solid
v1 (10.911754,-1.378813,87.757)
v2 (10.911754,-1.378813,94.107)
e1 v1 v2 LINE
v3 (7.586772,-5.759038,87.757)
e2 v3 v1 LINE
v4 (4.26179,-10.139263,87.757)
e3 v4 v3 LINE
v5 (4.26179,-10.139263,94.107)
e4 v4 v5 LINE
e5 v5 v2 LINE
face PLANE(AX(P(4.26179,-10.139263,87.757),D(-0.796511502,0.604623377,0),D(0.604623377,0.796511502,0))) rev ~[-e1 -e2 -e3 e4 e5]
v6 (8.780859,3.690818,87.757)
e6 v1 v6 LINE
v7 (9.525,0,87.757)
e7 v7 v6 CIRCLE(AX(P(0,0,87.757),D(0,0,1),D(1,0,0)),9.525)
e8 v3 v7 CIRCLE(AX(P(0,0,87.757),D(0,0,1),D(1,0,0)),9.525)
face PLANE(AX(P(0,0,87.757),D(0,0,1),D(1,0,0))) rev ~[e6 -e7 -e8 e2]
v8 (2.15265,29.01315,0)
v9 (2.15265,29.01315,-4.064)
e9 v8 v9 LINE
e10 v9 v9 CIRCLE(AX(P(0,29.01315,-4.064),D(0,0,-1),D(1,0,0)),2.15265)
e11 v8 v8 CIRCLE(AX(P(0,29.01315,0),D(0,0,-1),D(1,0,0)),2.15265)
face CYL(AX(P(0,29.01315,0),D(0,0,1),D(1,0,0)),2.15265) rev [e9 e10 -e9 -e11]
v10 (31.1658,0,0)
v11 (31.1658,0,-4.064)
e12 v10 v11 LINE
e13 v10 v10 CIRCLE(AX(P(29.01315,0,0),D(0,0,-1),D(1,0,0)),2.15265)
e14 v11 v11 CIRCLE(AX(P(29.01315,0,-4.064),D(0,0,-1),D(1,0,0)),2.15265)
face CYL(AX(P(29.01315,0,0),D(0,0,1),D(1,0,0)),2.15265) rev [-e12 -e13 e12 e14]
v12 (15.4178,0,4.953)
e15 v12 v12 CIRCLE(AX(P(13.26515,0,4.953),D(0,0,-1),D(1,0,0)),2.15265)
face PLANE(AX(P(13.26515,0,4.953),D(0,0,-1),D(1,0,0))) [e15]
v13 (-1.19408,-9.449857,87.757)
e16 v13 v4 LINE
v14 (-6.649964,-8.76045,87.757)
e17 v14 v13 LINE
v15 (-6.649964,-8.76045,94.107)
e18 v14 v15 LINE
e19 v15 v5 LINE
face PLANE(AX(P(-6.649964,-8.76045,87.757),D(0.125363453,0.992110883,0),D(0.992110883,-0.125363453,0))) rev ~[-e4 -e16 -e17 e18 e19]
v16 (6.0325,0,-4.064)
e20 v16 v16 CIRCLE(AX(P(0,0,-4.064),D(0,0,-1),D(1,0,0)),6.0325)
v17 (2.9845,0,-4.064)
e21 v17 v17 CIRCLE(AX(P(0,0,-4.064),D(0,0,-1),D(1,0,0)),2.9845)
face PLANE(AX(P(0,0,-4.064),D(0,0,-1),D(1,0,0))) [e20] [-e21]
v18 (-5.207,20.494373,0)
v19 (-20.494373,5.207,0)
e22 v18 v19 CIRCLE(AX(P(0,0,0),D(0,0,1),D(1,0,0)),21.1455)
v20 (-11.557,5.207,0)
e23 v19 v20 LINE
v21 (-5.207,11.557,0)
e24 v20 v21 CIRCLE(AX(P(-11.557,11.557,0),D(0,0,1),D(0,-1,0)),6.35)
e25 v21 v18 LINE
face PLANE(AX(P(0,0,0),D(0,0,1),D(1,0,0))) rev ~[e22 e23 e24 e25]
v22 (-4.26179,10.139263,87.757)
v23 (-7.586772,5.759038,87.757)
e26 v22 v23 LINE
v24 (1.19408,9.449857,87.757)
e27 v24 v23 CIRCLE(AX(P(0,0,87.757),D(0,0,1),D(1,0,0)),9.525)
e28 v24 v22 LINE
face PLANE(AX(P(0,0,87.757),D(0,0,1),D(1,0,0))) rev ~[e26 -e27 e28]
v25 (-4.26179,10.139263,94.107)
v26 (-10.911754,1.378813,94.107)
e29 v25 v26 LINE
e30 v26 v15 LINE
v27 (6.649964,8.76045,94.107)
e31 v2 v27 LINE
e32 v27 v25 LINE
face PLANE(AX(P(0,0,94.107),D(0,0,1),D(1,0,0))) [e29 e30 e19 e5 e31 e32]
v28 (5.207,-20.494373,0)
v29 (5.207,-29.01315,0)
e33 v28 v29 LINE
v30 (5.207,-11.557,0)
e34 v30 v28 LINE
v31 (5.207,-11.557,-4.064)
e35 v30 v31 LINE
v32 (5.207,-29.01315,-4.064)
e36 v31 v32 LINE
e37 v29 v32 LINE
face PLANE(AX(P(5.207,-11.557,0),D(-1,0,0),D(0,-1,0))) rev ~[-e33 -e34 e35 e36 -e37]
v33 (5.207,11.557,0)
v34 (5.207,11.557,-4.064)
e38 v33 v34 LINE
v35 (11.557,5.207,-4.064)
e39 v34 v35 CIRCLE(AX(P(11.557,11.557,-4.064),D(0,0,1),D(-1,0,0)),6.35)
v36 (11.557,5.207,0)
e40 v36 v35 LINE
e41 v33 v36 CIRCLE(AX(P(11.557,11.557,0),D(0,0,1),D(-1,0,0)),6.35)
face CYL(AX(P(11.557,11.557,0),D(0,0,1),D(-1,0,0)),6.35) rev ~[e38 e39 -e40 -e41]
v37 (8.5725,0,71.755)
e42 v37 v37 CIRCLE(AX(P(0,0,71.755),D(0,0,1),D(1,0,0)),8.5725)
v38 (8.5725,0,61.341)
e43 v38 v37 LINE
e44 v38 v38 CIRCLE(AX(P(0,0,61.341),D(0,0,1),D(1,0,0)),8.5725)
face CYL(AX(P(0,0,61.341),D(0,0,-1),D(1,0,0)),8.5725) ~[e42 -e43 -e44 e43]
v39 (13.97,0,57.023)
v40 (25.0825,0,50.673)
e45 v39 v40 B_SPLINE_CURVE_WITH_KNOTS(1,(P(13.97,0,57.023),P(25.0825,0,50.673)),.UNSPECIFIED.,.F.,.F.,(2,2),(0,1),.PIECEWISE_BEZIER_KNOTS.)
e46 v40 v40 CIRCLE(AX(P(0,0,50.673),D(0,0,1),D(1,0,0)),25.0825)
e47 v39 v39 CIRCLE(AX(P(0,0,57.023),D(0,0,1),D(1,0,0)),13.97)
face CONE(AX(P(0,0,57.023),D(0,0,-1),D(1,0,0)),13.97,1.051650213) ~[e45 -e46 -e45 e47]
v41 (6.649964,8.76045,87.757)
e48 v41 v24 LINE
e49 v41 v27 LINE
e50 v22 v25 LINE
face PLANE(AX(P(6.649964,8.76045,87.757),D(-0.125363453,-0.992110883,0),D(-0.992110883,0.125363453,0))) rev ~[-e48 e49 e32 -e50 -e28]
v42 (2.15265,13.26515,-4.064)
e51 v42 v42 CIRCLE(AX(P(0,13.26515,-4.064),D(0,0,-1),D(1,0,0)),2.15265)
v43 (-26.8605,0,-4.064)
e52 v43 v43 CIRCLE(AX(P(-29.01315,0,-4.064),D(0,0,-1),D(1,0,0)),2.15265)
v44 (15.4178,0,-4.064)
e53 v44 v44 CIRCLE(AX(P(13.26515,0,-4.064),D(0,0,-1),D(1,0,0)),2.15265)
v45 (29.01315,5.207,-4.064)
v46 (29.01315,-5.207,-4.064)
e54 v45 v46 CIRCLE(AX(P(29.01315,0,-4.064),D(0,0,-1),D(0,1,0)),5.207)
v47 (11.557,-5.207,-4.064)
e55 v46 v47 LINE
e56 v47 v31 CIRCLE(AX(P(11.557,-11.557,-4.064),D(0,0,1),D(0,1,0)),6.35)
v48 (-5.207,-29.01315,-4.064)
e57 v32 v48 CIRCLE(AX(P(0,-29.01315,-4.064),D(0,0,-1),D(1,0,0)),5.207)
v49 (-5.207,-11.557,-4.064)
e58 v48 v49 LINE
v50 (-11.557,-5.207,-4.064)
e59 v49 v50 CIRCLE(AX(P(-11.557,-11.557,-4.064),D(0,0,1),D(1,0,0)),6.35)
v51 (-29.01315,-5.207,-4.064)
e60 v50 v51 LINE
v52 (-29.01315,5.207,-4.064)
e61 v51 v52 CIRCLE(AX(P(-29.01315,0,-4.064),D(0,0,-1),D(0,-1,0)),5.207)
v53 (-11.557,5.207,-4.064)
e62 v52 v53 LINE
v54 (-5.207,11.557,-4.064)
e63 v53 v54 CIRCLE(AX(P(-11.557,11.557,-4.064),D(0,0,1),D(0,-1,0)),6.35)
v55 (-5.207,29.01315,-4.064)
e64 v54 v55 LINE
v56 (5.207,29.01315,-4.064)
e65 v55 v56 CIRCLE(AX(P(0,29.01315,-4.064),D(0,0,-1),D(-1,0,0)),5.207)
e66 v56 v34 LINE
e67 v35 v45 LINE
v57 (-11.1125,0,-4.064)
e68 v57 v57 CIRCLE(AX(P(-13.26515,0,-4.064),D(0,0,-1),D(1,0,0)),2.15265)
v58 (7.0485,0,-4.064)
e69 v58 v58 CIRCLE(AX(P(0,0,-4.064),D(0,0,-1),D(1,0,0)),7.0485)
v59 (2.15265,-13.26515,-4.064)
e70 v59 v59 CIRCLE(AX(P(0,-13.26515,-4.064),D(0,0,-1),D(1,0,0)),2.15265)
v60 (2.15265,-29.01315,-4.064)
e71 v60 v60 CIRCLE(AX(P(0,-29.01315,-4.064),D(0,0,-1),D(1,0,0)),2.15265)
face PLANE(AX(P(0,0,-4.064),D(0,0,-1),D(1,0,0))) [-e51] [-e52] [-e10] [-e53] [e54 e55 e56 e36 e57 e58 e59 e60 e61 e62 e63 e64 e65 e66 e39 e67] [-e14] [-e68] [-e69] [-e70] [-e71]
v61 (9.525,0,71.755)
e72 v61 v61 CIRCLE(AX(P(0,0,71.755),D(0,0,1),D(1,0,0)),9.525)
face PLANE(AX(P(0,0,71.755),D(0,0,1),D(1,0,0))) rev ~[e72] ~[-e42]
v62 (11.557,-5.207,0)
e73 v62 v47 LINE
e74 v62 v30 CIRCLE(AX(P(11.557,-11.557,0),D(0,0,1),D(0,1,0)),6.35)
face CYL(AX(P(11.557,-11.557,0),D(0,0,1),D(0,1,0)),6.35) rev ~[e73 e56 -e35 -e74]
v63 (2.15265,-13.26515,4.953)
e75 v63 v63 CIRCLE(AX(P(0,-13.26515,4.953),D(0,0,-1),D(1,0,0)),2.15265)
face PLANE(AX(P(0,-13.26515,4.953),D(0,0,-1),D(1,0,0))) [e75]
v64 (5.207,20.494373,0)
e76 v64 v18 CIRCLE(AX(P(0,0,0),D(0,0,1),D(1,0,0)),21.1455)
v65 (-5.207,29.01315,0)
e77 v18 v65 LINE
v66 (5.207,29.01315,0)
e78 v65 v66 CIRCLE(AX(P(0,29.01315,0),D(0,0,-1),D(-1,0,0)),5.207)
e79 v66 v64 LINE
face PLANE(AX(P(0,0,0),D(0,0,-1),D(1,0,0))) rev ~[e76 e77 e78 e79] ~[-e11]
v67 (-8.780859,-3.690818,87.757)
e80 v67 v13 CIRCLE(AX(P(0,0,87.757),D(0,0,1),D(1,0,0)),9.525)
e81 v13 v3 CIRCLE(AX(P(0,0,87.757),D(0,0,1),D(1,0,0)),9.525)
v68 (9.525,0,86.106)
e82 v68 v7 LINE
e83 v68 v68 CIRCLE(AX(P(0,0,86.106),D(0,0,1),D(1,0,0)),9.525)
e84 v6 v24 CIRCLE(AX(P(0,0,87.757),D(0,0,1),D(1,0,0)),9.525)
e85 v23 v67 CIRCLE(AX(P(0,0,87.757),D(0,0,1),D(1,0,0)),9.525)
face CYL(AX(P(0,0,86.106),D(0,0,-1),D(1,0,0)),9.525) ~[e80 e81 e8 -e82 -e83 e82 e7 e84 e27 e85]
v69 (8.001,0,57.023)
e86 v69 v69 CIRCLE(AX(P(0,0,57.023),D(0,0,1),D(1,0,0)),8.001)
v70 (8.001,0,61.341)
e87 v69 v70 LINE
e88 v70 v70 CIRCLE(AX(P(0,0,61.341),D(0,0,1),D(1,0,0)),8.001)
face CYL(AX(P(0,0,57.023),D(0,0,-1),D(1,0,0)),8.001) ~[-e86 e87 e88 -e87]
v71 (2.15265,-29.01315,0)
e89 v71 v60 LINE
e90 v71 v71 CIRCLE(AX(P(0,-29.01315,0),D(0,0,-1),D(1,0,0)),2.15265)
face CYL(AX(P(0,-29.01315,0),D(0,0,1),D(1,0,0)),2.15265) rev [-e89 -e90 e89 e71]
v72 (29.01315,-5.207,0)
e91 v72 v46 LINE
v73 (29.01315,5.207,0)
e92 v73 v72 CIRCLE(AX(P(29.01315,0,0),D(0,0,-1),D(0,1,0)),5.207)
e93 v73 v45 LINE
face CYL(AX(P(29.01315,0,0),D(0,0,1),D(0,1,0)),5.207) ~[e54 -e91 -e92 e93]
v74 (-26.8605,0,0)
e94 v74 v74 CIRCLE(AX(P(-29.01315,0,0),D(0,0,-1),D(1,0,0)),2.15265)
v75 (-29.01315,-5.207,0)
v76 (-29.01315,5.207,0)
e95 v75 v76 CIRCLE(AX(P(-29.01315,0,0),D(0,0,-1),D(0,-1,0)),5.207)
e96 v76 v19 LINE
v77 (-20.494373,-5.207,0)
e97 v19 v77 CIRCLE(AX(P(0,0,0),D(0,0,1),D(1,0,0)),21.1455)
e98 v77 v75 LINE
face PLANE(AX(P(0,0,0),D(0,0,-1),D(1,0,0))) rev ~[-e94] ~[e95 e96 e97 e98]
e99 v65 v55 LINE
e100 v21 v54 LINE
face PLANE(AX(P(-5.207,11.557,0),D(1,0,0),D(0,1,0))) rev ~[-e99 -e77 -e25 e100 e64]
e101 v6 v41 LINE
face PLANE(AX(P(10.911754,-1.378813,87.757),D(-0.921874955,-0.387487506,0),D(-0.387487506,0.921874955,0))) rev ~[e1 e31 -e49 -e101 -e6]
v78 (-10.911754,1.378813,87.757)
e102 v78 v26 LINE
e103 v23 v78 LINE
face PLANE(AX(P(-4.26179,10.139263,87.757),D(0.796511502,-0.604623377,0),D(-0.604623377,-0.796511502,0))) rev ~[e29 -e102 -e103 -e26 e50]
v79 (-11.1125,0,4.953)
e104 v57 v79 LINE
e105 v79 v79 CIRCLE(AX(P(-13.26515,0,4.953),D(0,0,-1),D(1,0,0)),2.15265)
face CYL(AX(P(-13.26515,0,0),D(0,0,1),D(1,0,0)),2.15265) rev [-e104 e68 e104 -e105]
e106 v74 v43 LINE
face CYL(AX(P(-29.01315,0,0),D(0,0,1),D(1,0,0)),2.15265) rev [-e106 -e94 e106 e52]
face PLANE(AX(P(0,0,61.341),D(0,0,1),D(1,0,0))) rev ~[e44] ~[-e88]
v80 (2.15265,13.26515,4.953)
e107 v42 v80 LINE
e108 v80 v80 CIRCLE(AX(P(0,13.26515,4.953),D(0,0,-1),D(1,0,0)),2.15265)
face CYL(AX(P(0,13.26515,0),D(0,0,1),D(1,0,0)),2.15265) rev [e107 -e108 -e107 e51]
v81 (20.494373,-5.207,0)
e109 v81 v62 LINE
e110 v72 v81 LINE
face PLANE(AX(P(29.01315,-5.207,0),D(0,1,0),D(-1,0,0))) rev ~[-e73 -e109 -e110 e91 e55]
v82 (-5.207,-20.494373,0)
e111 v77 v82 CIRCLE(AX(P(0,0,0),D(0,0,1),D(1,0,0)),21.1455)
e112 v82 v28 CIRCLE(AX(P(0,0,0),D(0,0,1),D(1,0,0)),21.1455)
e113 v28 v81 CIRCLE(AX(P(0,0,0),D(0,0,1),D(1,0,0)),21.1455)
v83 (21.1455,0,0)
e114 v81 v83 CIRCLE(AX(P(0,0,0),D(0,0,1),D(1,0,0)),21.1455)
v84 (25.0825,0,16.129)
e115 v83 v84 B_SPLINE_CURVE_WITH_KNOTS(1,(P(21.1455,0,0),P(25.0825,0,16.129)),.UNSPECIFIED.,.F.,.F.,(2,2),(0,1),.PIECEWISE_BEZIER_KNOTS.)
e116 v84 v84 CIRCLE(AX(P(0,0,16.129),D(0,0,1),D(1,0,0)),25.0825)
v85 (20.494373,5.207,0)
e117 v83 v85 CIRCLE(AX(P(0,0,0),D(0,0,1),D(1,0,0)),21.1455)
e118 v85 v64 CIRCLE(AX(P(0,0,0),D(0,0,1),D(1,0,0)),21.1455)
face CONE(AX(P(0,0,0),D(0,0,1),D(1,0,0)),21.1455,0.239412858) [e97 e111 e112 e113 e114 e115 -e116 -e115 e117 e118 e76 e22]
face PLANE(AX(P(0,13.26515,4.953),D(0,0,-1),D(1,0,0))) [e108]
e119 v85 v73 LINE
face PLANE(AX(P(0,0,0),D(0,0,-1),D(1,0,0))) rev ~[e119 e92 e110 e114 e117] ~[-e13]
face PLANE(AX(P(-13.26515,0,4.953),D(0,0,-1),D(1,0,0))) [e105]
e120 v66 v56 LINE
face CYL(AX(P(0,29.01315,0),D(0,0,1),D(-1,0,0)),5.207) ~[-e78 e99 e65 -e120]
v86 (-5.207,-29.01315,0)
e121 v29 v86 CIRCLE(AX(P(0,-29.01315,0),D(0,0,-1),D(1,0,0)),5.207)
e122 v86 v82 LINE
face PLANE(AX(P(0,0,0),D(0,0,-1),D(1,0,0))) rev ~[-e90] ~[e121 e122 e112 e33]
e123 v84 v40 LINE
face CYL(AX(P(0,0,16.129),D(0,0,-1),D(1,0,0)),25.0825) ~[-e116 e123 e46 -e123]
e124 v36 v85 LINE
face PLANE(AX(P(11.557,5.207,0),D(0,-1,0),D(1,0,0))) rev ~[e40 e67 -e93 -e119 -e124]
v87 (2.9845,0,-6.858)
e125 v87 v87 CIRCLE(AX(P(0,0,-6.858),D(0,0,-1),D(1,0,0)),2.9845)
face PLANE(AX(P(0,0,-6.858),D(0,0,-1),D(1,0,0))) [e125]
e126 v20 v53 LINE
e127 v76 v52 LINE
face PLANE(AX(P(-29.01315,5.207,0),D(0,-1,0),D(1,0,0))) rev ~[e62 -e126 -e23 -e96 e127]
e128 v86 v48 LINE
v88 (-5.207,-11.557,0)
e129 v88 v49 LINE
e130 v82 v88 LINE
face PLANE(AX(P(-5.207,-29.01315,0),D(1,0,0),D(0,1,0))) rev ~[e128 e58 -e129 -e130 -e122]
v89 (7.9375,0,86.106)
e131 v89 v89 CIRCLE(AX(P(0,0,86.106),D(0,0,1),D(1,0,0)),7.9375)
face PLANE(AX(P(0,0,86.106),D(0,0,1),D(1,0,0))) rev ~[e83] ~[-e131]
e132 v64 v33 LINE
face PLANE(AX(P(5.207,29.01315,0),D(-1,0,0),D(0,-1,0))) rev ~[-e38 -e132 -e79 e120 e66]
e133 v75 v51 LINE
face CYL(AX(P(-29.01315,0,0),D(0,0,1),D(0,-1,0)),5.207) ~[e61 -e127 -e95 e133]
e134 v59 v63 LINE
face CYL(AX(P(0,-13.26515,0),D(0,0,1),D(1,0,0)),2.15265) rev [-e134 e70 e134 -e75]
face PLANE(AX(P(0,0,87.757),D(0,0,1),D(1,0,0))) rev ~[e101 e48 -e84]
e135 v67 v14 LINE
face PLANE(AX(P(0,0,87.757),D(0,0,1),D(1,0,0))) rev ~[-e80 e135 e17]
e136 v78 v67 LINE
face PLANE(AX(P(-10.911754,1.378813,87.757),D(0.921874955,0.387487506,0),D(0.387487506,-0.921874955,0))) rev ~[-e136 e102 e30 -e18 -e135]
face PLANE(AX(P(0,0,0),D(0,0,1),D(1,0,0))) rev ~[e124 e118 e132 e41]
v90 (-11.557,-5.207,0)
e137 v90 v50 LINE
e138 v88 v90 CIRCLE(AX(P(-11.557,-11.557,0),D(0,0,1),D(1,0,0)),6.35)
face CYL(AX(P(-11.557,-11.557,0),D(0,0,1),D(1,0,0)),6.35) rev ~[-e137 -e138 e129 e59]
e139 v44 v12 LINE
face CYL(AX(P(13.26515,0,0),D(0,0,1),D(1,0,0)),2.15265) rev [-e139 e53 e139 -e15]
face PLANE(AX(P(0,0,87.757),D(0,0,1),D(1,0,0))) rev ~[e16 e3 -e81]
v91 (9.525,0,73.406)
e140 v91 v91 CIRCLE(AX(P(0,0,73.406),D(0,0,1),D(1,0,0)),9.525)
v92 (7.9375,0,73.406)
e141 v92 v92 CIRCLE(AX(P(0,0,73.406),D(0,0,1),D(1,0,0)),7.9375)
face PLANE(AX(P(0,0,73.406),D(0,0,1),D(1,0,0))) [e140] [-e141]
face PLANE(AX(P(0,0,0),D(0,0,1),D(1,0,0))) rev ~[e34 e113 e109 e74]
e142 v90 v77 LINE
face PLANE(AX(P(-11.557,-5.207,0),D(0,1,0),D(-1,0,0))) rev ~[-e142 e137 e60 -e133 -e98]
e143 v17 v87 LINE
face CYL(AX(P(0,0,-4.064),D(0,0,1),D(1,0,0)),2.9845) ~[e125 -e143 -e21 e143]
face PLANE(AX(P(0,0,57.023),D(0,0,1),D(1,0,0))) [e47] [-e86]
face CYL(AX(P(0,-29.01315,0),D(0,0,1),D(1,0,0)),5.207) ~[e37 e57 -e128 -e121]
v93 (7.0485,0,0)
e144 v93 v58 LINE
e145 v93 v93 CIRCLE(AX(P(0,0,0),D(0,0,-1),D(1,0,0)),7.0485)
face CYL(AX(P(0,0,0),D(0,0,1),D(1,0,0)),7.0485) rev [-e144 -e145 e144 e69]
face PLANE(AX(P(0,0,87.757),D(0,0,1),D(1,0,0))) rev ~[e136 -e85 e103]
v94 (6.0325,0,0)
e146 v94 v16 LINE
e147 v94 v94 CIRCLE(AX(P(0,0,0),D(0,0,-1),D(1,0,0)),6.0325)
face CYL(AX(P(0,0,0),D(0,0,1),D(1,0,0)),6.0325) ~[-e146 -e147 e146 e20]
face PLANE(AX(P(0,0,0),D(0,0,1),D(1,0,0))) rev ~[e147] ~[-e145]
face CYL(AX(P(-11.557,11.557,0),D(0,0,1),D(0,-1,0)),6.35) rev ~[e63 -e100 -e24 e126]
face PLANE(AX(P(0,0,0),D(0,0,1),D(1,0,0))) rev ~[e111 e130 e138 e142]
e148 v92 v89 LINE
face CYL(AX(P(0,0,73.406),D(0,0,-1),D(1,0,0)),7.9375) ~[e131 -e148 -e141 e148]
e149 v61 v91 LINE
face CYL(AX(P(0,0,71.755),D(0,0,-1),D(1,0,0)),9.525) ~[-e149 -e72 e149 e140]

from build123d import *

# Parameters (mm, degrees)
F0_R      = 21.1455
F2_R      = 25.0825
F4_DEPTH  = 34.544
F6_R      = 13.97
F4_FACE_R = 25.0825
F8_R      = 8.001
F9_DEPTH  = 4.318
F10_R     = 3.00355
F11_DEPTH = 15.24
F12_R     = 6.0325
F13_DEPTH = 4.064
F14_R     = 2.9845
F15_DEPTH = 2.794
F16_R     = 2.15265
F17_DEPTH = 4.953
F18_R     = 2.15265
F18_R_2   = 7.0485
F19_DEPTH = 4.064
F20_R     = 8.5725
F21_DEPTH = 10.414
F22_R     = 9.525
F23_DEPTH = 1.651
F24_R     = 7.9375
F25_DEPTH = 12.7
F26_R     = 9.525
F27_DEPTH = 1.651
F29_DEPTH = 6.35


# Not quite as in the source:
# - a feature names something its author has since deleted; it is built from what else it names


with BuildPart() as f3:
    # F0 (on Top) → F3 section 0
    with BuildSketch(Plane.XY):
        Circle(F0_R)
    # F2 (on offset) → F3 section 1
    with BuildSketch(Plane.XY.offset(16.129)):
        Circle(F2_R)
    loft()

    # F4 (add): a face of the model
    f4_faces = [f3.faces().sort_by_distance(p)[0] for p in [
        (0, 0, 16.129),
    ]]
    extrude(f4_faces, amount=F4_DEPTH)

    # F6 (on offset) → F7 section 0
    with BuildSketch(Plane.XY.offset(57.023)):
        Circle(F6_R)
    # F4_face (on face) → F7 section 1
    with BuildSketch(Plane.XY.offset(50.673)):
        Circle(F4_FACE_R)
    loft()

    # F8 (on face) → F9 (join)
    with BuildSketch(Plane.XY.offset(57.023)):
        Circle(F8_R)
    extrude(amount=F9_DEPTH)

    # F10 (on face) → F11 (join)
    with BuildSketch(Plane.XY.offset(61.341)):
        Circle(F10_R)
    extrude(amount=F11_DEPTH)

    # F12 (on face) → F13 (join)
    with BuildSketch(Plane(origin=(0, 0, 0), x_dir=(1, 0, 0), z_dir=(0, 0, -1))):
        Circle(F12_R)
    extrude(amount=F13_DEPTH)

    # F14 (on face) → F15 (join)
    with BuildSketch(Plane(origin=(0, 0, -4.064), x_dir=(1, 0, 0), z_dir=(0, 0, -1))):
        Circle(F14_R)
    extrude(amount=F15_DEPTH)

    # F16 (on face) → F17 (cut)
    with BuildSketch(Plane(origin=(0, 0, 0), x_dir=(1, 0, 0), z_dir=(0, 0, -1))):
        with Locations((0, 13.26515)):
            Circle(F16_R)
        with Locations((13.26515, 0)):
            Circle(F16_R)
        with Locations((0, -13.26515)):
            Circle(F16_R)
        with Locations((-13.26515, 0)):
            Circle(F16_R)
    extrude(amount=-F17_DEPTH, mode=Mode.SUBTRACT)

    # F18 (on face) → F19 (join)
    with BuildSketch(Plane(origin=(0, 0, 0), x_dir=(1, 0, 0), z_dir=(0, 0, -1))):
        with BuildLine():
            ThreePointArc((11.557, 5.207), (7.0668719395, 7.0668719395), (5.207, 11.557))
            Line((5.207, 11.557), (5.207, 29.01315))
            ThreePointArc((5.207, 29.01315), (0, 34.22015), (-5.207, 29.01315))
            Line((-5.207, 29.01315), (-5.207, 11.557))
            ThreePointArc((-5.207, 11.557), (-7.0668719395, 7.0668719395), (-11.557, 5.207))
            Line((-11.557, 5.207), (-29.01315, 5.207))
            ThreePointArc((-29.01315, 5.207), (-34.22015, 0), (-29.01315, -5.207))
            Line((-29.01315, -5.207), (-11.557, -5.207))
            ThreePointArc((-11.557, -5.207), (-7.0668719395, -7.0668719395), (-5.207, -11.557))
            Line((-5.207, -11.557), (-5.207, -29.01315))
            ThreePointArc((-5.207, -29.01315), (0, -34.22015), (5.207, -29.01315))
            Line((5.207, -29.01315), (5.207, -11.557))
            ThreePointArc((5.207, -11.557), (7.0668719395, -7.0668719395), (11.557, -5.207))
            Line((11.557, -5.207), (29.01315, -5.207))
            ThreePointArc((29.01315, -5.207), (34.22015, 0), (29.01315, 5.207))
            Line((29.01315, 5.207), (11.557, 5.207))
        make_face()
        with Locations((0, -29.01315)):
            Circle(F18_R, mode=Mode.SUBTRACT)
        with Locations((0, -13.26515)):
            Circle(F18_R, mode=Mode.SUBTRACT)
        with Locations((-29.01315, 0)):
            Circle(F18_R, mode=Mode.SUBTRACT)
        with Locations((-13.26515, 0)):
            Circle(F18_R, mode=Mode.SUBTRACT)
        Circle(F18_R_2, mode=Mode.SUBTRACT)
        with Locations((13.26515, 0)):
            Circle(F18_R, mode=Mode.SUBTRACT)
        with Locations((0, 13.26515)):
            Circle(F18_R, mode=Mode.SUBTRACT)
        with Locations((29.01315, 0)):
            Circle(F18_R, mode=Mode.SUBTRACT)
        with Locations((0, 29.01315)):
            Circle(F18_R, mode=Mode.SUBTRACT)
    extrude(amount=F19_DEPTH)

    # F20 (on face) → F21 (join)
    with BuildSketch(Plane.XY.offset(61.341)):
        Circle(F20_R)
    extrude(amount=F21_DEPTH)

    # F22 (on face) → F23 (join)
    with BuildSketch(Plane.XY.offset(71.755)):
        Circle(F22_R)
    extrude(amount=F23_DEPTH)

    # F24 (on face) → F25 (join)
    with BuildSketch(Plane.XY.offset(73.406)):
        Circle(F24_R)
    extrude(amount=F25_DEPTH)

    # F26 (on face) → F27 (join)
    with BuildSketch(Plane.XY.offset(86.106)):
        Circle(F26_R)
    extrude(amount=F27_DEPTH)

    # F28 (on face) → F29 (join)
    with BuildSketch(Plane.XY.offset(87.757)):
        Polygon((6.6499638915, 8.760449774), (-4.2617901071, 10.1392625512), (-10.9117539986, 1.3788127773), (-6.6499638915, -8.760449774), (4.2617901071, -10.1392625512), (10.9117539986, -1.3788127773), align=None)
    extrude(amount=F29_DEPTH)


solid = f3.part
